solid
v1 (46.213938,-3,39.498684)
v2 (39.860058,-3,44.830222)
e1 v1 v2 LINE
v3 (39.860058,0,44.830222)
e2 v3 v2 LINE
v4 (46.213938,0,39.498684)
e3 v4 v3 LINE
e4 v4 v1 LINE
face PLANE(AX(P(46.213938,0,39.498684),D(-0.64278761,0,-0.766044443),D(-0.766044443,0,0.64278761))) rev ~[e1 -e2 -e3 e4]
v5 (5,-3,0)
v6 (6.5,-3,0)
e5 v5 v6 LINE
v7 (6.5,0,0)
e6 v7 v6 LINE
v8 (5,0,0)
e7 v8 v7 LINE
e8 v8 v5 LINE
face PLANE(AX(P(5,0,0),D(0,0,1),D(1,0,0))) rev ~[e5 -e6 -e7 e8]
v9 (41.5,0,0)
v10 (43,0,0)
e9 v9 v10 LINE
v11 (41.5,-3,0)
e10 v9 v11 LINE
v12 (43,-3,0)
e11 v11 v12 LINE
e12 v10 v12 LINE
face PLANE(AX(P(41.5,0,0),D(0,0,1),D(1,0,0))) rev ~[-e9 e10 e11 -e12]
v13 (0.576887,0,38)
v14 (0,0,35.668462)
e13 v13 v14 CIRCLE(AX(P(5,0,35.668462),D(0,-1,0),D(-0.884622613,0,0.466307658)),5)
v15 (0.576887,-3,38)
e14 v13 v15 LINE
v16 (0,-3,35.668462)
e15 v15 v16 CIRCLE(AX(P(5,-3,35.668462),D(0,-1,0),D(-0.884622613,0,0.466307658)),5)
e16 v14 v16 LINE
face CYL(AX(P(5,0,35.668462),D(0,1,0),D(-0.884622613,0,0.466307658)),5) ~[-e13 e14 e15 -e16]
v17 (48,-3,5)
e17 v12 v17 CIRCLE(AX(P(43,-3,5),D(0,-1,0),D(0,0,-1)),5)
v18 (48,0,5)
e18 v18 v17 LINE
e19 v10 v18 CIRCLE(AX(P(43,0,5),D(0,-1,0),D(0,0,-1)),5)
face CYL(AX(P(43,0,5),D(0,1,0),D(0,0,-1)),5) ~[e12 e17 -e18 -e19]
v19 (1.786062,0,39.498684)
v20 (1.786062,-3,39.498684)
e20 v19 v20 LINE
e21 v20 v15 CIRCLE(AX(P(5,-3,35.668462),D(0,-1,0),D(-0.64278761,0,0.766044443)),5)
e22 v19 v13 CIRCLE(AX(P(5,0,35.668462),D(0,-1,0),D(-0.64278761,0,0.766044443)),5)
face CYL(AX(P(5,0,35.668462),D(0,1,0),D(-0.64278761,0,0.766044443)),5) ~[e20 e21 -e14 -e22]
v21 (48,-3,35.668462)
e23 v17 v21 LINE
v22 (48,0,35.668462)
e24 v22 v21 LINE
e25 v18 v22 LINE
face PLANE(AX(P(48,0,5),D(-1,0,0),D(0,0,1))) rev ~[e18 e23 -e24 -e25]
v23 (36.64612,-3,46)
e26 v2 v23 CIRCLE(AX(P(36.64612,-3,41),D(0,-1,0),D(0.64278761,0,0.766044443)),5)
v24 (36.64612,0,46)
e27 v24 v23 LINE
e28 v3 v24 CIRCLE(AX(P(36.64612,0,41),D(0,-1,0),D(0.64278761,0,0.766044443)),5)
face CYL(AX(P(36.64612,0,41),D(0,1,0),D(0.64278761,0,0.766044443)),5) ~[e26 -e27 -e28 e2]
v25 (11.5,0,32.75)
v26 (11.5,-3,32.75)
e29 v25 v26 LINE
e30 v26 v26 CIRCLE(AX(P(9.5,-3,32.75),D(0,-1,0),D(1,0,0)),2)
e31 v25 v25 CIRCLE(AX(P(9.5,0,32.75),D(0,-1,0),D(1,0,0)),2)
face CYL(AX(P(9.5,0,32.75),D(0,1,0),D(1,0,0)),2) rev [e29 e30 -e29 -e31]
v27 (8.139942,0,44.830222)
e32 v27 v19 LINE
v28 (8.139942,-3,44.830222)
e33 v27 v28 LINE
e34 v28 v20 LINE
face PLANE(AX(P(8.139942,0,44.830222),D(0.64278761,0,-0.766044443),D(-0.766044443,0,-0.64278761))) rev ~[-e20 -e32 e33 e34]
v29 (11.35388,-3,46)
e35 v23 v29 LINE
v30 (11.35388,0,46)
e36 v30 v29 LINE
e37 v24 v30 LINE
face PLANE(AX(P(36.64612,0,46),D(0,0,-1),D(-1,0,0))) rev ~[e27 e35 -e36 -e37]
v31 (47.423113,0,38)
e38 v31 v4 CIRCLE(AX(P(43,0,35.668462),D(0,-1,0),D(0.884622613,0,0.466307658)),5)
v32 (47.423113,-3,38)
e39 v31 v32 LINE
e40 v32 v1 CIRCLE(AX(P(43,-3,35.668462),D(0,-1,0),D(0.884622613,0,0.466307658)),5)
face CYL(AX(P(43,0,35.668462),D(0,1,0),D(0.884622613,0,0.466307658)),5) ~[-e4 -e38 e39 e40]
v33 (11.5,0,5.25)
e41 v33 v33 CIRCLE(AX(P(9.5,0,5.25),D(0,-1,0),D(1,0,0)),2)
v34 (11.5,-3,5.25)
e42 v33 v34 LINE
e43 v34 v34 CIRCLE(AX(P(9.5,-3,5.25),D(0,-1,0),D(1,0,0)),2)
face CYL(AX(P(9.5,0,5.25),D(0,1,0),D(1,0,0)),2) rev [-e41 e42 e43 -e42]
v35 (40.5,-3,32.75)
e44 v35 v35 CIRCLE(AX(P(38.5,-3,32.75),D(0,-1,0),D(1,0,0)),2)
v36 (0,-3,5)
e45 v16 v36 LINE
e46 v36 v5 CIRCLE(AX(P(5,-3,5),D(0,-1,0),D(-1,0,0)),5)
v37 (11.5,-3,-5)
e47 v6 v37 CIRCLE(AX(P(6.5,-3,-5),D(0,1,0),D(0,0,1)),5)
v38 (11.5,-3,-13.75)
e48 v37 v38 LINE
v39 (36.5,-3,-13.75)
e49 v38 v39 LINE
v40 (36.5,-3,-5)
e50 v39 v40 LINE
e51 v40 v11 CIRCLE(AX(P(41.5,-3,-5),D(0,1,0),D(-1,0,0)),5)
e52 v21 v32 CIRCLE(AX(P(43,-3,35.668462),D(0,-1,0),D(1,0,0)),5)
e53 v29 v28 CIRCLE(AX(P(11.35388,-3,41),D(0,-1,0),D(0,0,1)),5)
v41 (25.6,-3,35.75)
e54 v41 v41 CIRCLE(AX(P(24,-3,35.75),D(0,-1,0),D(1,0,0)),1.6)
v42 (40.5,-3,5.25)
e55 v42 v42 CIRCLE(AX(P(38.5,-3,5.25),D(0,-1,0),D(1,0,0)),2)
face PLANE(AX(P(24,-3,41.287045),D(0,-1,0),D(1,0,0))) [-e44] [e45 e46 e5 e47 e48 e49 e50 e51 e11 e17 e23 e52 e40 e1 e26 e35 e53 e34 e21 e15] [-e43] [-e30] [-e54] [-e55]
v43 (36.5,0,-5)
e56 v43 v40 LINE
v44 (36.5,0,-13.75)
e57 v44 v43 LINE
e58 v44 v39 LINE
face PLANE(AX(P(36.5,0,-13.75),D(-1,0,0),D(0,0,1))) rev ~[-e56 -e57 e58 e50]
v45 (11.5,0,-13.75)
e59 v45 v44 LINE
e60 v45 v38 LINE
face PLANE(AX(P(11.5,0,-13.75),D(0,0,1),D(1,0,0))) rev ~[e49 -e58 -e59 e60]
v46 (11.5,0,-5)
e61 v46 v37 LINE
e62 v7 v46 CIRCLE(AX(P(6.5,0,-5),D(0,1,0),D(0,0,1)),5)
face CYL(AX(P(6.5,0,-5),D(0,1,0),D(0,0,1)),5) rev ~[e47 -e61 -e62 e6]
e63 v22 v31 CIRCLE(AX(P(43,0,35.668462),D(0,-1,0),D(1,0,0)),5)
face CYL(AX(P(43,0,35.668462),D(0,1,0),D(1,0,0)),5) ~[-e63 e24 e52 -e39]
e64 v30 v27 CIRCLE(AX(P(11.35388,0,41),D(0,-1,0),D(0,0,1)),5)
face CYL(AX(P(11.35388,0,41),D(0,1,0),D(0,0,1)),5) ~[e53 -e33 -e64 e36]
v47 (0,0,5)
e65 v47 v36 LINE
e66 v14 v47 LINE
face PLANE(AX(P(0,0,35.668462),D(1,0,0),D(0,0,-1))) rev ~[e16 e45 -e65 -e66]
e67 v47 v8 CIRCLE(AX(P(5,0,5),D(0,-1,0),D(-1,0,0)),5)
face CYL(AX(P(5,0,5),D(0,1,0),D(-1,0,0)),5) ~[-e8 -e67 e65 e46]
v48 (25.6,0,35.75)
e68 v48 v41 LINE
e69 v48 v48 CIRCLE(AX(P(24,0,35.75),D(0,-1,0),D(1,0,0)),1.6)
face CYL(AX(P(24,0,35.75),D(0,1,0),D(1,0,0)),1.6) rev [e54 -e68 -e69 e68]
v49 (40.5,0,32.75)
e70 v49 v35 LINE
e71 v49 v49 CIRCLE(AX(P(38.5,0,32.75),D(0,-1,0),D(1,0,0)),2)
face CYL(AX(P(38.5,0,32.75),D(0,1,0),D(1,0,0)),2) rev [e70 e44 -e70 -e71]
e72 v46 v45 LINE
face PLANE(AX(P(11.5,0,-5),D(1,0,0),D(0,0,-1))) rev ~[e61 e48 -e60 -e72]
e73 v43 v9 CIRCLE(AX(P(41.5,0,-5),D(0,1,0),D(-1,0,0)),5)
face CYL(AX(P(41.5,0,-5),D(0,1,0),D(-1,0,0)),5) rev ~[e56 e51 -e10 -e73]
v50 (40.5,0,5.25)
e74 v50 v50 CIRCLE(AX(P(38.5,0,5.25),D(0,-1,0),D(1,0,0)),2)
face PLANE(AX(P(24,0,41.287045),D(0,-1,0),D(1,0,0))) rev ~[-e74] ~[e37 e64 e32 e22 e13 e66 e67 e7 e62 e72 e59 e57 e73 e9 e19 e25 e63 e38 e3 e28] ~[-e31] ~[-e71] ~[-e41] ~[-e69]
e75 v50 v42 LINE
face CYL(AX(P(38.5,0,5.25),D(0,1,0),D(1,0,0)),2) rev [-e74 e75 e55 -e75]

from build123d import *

# Parameters (mm, degrees)
F0_R     = 2
F0_R_2   = 1.6
F1_DEPTH = 3


# Not quite as in the source:
# - a feature names something its author has since deleted; it is built from what else it names


with BuildPart() as f1:
    # F0 (on Front) → F1 (new body)
    with BuildSketch(Plane.XZ):
        with BuildLine():
            ThreePointArc((1.7860619516, 39.4986839248), (1.1086440911, 38.8081032796), (0.5768869335, 38))
            Line((0.5768869335, 38), (47.4231130665, 38))
            ThreePointArc((47.4231130665, 38), (46.8913559089, 38.8081032796), (46.2139380484, 39.4986839248))
            Line((46.2139380484, 39.4986839248), (39.8600581363, 44.8302222156))
            ThreePointArc((39.8600581363, 44.8302222156), (38.3562208045, 45.6984631039), (36.6461200879, 46))
            Line((36.6461200879, 46), (11.3538799121, 46))
            ThreePointArc((11.3538799121, 46), (9.6437791955, 45.6984631039), (8.1399418637, 44.8302222156))
            Line((8.1399418637, 44.8302222156), (1.7860619516, 39.4986839248))
        make_face()
        with BuildLine():
            Line((47.4231130665, 38), (0.5768869335, 38))
            ThreePointArc((0.5768869335, 38), (0.1463639747, 36.869385243), (0, 35.6684617092))
            Line((0, 35.6684617092), (0, 5))
            ThreePointArc((0, 5), (1.4644660941, 1.4644660941), (5, 0))
            Line((5, 0), (6.5, 0))
            ThreePointArc((6.5, 0), (10.0355339059, -1.4644660941), (11.5, -5))
            Line((11.5, -5), (11.5, -5.0126606831))
            Line((11.5, -5.0126606831), (11.5, -13.75))
            Line((11.5, -13.75), (36.5, -13.75))
            Line((36.5, -13.75), (36.5, -5))
            ThreePointArc((36.5, -5), (37.9644660941, -1.4644660941), (41.5, 0))
            Line((41.5, 0), (43, 0))
            ThreePointArc((43, 0), (46.5355339059, 1.4644660941), (48, 5))
            Line((48, 5), (48, 35.6684617092))
            ThreePointArc((48, 35.6684617092), (47.8536360253, 36.869385243), (47.4231130665, 38))
        make_face()
        with Locations((9.5, 5.25)):
            Circle(F0_R, mode=Mode.SUBTRACT)
        with Locations((38.5, 5.25)):
            Circle(F0_R, mode=Mode.SUBTRACT)
        with Locations((9.5, 32.75)):
            Circle(F0_R, mode=Mode.SUBTRACT)
        with Locations((24, 35.75)):
            Circle(F0_R_2, mode=Mode.SUBTRACT)
        with Locations((38.5, 32.75)):
            Circle(F0_R, mode=Mode.SUBTRACT)
    extrude(amount=F1_DEPTH)


solid = f1.part
